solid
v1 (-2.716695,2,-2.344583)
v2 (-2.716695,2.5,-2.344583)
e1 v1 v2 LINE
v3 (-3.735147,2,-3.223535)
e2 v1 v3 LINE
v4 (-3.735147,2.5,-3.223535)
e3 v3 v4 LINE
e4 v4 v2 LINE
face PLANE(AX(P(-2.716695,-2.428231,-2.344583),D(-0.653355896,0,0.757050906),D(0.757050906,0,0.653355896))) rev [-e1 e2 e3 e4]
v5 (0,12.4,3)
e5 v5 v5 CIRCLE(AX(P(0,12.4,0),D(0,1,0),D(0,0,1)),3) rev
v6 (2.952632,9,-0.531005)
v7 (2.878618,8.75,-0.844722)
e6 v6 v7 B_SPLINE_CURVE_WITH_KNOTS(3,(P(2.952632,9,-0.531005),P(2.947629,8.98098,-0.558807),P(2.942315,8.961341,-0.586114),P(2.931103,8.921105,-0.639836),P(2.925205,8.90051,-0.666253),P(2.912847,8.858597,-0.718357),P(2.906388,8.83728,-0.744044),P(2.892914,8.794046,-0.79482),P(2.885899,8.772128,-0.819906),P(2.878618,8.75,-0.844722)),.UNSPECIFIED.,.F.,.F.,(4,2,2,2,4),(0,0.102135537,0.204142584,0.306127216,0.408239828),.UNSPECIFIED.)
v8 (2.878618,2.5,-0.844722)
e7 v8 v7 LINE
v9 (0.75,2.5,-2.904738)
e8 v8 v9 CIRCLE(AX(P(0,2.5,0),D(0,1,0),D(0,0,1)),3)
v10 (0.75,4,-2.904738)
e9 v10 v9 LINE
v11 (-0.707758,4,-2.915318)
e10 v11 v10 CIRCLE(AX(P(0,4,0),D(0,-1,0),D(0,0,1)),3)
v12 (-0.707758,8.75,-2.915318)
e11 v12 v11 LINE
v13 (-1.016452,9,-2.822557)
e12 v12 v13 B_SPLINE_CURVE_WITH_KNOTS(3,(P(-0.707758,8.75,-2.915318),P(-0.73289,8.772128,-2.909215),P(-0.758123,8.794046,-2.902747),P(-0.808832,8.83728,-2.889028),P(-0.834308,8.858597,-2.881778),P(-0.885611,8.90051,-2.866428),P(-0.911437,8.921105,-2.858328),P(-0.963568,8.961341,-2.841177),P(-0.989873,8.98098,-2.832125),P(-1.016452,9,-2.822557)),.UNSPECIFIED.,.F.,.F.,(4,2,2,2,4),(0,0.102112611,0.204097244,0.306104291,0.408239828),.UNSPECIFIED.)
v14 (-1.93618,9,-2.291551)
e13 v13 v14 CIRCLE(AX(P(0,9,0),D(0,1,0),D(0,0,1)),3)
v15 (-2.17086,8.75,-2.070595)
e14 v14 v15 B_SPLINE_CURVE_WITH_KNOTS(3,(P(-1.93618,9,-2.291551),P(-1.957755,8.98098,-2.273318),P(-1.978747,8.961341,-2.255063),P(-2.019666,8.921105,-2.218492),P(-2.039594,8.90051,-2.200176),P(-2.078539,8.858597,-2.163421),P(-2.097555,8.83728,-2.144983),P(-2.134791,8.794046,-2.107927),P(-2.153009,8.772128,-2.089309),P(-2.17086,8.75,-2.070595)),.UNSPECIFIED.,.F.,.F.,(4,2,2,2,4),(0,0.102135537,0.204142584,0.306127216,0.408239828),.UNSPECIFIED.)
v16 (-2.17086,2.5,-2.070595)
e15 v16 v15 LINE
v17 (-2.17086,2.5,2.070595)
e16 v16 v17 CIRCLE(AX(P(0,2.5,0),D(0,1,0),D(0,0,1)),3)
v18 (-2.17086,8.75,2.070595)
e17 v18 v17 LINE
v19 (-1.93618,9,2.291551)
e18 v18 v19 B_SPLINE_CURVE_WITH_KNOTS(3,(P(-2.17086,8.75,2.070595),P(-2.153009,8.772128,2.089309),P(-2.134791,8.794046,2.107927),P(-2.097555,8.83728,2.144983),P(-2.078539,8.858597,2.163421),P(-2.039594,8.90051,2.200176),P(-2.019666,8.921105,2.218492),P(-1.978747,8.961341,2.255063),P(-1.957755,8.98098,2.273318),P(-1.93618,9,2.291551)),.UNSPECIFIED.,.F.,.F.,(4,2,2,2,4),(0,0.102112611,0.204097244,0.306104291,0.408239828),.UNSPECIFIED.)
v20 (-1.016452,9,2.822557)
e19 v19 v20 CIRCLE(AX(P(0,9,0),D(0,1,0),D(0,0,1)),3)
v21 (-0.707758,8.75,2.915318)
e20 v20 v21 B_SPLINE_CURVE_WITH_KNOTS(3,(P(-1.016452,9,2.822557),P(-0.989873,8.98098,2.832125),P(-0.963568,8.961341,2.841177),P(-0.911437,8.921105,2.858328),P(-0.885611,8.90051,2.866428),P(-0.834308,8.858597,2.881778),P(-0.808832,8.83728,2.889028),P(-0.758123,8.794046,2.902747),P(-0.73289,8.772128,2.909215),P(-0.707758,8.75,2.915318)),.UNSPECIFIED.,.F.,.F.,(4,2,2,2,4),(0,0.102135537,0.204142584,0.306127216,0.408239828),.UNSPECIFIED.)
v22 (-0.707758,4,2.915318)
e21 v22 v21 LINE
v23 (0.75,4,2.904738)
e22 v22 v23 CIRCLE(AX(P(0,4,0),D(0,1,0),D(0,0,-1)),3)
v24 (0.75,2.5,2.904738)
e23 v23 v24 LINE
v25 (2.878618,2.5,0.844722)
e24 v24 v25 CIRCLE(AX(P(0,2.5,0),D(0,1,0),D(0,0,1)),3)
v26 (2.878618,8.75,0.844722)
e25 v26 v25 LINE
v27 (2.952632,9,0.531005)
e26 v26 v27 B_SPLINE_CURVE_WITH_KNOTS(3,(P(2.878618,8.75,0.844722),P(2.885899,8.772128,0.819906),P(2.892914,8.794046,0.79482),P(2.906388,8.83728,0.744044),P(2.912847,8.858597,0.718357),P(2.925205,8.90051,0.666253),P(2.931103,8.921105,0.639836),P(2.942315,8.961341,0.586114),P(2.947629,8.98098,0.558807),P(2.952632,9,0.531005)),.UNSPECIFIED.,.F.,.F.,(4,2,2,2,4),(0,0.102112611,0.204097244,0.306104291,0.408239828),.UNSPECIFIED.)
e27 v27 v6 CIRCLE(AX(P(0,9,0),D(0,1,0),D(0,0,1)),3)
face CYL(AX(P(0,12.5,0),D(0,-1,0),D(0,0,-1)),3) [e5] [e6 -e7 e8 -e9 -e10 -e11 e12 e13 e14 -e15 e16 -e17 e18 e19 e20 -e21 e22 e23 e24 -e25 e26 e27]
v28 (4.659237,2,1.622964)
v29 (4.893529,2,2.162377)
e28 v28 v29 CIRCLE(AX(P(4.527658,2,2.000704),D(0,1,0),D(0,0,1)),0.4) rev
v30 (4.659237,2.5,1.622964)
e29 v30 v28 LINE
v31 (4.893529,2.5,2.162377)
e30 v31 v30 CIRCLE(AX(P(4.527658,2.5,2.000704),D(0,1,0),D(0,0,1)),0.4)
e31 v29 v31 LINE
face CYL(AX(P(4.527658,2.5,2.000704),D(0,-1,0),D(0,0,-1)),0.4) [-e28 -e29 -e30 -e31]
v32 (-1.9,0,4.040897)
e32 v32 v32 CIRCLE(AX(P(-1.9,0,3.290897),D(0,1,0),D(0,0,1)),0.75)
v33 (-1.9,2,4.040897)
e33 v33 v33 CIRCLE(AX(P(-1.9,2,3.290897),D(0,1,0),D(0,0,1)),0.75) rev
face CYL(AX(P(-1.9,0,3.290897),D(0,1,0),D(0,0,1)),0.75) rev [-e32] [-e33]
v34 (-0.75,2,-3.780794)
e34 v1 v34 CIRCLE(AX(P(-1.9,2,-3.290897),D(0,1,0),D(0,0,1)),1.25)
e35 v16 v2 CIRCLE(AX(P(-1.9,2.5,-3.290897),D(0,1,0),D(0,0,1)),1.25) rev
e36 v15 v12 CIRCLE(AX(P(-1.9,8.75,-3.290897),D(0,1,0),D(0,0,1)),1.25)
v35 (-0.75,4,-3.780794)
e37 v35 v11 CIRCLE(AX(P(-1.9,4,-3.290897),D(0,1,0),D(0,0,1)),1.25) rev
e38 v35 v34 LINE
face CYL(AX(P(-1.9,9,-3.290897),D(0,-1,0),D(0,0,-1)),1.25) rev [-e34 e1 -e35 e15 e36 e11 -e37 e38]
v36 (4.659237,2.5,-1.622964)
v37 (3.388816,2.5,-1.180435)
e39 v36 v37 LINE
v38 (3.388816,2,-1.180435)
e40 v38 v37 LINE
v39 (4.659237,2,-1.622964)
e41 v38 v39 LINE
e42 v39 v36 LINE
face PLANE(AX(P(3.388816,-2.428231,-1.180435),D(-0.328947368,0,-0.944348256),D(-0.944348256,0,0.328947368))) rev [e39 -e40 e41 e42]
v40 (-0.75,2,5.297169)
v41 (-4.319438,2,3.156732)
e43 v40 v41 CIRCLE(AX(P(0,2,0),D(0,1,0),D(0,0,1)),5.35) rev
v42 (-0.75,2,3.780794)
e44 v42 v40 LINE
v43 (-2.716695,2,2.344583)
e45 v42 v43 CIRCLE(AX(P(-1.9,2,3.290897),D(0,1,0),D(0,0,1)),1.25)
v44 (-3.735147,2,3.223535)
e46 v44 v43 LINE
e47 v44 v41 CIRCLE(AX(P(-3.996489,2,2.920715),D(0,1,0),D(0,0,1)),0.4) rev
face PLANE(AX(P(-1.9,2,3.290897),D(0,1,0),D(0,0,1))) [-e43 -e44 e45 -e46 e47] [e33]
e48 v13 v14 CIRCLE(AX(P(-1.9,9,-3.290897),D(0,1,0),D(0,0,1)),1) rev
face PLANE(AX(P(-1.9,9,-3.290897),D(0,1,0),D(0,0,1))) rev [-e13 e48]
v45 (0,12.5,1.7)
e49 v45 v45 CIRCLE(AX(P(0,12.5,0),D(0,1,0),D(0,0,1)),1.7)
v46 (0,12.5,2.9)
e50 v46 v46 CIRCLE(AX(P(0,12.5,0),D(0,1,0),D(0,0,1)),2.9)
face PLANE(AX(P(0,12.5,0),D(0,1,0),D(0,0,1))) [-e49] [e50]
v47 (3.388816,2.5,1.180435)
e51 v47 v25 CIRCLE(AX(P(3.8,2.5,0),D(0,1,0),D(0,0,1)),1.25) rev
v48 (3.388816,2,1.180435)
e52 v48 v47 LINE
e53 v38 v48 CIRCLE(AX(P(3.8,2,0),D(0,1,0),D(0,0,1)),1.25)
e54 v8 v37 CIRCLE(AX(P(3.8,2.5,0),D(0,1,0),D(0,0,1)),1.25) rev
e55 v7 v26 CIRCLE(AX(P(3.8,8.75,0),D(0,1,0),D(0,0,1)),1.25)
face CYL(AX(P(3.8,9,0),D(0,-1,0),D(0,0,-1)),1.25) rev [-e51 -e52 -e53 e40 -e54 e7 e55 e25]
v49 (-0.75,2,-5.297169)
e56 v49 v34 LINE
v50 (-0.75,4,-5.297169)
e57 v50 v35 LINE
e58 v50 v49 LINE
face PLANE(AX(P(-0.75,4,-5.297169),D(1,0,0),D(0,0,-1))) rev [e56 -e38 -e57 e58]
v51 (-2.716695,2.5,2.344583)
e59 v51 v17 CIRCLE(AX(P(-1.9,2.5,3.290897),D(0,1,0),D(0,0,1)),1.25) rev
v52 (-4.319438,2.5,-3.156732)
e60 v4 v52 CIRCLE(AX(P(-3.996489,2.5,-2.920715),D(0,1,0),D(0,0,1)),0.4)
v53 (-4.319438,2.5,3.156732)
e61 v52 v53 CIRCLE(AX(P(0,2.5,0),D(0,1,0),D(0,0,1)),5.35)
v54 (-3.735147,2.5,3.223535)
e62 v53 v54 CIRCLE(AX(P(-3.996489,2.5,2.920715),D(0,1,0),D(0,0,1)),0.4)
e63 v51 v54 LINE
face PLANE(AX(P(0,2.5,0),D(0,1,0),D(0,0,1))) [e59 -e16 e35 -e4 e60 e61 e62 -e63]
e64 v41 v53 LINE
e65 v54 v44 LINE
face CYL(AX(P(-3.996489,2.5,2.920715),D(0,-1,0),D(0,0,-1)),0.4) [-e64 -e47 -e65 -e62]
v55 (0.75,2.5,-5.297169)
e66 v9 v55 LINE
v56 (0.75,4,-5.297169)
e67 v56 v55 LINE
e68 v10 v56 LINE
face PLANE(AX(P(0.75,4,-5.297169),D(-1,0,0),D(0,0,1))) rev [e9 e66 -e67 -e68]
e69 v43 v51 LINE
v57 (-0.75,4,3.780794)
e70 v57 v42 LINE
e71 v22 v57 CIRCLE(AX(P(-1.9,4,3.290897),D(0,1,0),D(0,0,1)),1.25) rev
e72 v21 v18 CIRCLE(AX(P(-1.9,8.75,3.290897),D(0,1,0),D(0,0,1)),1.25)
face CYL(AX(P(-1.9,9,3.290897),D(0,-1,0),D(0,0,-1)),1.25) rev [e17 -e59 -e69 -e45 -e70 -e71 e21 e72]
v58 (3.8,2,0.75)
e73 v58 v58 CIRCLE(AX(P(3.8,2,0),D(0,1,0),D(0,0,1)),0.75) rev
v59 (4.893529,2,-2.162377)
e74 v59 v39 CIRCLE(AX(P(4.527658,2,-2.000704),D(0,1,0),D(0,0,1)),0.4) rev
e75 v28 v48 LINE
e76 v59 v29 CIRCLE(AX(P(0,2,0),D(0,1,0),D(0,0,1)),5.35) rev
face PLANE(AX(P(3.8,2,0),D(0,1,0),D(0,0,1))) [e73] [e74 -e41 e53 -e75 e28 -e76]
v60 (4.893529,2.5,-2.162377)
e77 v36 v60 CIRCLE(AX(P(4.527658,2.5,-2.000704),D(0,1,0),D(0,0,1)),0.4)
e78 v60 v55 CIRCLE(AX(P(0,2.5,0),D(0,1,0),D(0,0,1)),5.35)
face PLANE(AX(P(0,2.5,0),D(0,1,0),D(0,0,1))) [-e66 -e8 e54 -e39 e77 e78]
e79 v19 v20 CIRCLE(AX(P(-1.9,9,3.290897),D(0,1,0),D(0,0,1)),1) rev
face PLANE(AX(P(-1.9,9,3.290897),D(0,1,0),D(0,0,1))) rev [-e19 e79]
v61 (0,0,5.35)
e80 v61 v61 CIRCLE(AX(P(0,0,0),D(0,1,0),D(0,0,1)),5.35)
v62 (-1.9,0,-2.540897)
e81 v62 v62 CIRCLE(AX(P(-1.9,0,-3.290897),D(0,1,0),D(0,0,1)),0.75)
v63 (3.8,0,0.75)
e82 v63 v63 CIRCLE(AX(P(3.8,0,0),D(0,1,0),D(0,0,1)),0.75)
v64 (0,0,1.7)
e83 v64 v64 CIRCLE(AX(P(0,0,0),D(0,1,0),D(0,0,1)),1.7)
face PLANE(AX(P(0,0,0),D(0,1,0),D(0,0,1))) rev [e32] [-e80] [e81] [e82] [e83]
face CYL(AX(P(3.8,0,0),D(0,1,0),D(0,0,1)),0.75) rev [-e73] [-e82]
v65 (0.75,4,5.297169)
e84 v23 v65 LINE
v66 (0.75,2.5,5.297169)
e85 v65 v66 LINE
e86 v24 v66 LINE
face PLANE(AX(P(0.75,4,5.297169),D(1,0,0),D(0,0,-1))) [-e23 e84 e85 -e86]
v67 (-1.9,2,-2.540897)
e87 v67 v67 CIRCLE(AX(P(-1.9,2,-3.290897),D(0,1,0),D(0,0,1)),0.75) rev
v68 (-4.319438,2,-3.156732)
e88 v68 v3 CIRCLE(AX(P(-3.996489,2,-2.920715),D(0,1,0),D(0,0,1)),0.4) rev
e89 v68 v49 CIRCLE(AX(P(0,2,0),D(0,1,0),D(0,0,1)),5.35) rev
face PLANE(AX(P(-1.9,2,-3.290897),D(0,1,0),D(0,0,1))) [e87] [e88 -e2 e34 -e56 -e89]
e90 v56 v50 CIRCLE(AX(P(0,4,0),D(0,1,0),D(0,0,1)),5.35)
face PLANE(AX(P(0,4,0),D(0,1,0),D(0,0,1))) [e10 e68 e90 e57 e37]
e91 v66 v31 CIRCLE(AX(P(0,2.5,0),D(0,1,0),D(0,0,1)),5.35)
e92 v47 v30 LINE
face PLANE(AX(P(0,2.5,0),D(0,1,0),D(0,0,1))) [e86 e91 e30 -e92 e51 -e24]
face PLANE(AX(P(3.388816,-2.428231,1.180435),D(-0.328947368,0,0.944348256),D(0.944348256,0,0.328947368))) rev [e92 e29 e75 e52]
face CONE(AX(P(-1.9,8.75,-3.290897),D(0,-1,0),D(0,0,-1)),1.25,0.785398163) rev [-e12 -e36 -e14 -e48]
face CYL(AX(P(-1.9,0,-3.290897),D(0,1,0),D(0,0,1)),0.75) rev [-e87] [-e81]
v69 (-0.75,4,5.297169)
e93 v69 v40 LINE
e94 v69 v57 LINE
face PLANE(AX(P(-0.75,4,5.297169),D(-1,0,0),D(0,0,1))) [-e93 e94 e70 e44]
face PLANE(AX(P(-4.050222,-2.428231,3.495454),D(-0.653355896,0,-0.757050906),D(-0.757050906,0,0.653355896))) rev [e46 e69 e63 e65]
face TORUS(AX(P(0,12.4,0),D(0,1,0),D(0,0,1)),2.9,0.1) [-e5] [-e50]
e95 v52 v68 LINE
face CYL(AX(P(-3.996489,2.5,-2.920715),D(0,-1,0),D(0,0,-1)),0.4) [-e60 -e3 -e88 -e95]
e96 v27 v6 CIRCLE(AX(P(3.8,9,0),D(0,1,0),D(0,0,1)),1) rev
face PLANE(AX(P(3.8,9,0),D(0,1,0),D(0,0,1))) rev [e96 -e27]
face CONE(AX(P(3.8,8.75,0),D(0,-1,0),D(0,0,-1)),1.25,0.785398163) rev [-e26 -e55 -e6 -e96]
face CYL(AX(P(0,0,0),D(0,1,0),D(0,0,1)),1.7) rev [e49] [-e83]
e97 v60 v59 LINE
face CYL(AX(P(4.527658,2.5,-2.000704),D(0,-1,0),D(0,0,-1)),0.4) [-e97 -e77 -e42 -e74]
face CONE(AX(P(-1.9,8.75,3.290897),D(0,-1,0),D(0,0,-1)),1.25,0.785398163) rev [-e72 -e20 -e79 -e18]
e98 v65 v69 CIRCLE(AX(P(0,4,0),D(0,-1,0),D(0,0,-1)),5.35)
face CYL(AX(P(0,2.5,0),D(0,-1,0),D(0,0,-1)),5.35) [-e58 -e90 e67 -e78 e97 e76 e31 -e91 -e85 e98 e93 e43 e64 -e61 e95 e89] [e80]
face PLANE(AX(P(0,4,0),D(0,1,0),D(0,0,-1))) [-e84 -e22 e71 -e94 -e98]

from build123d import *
from build123d.topology import SkipClean

# Parameters (mm, degrees)
SKETCH1_R           = 5.35
BOSS_EXTRUDE1_DEPTH = 2.5
HOLE1_OUTLINE_R     = 1.7
HOLE1_DEPTH         = 2.5
SKETCH3_R           = 3
SKETCH3_R_2         = 1.7
BOSS_EXTRUDE2_DEPTH = 10
FILLET1_R           = 0.1
BOSS_EXTRUDE3_DEPTH = 1.5
SKETCH8_R           = 0.75
CUT_EXTRUDE1_DEPTH  = 13.539736839
CUT_EXTRUDE3_START  = -0.5
SKETCH13_R          = 1.25
CUT_EXTRUDE3_DEPTH  = 7
CHAMFER1_SIZE       = 0.25
CUT_EXTRUDE4_START  = -0.5
CUT_EXTRUDE4_DEPTH  = 0.5
FILLET2_R           = 0.4


# Read off the part's stored shape, not the designer's step: Hole1
with BuildPart() as part:
    # Sketch1 → Boss-Extrude1 (new body)
    with BuildSketch(Plane(origin=(0, 0, 0), x_dir=(1, 0, 0), z_dir=(0, 1, 0))):
        with Locations(Location((0, 0, 0), (0, 0, 270))):
            Circle(SKETCH1_R)
    extrude(amount=BOSS_EXTRUDE1_DEPTH)

    # Hole1 outline → Hole1 (cut)
    with BuildSketch(Plane(origin=(0, 0, 0), x_dir=(1, 0, 0), z_dir=(0, 1, 0))):
        Circle(HOLE1_OUTLINE_R)
    extrude(amount=HOLE1_DEPTH, mode=Mode.SUBTRACT)

    # Sketch3 → Boss-Extrude2 (add)
    with BuildSketch(Plane(origin=(0, 2.5, 0), x_dir=(1, 0, 0), z_dir=(0, 1, 0))):
        with Locations(Location((0, 0, 0), (0, 0, 270))):
            Circle(SKETCH3_R)
        with Locations(Location((0, 0, 0), (0, 0, 270))):
            Circle(SKETCH3_R_2, mode=Mode.SUBTRACT)
    extrude(amount=BOSS_EXTRUDE2_DEPTH)

    # Fillet1
    fillet1_edges = [part.edges().sort_by_distance(p)[0] for p in [
        (0, 12.5, -3),
    ]]
    fillet(fillet1_edges, radius=FILLET1_R)

    # Sketch5 → Boss-Extrude3 (add)
    with BuildSketch(Plane(origin=(0, 2.5, 0), x_dir=(1, 0, 0), z_dir=(0, 1, 0))):
        with BuildLine():
            Line((-0.75, 5.297169055), (-0.75, 2.90473751))
            ThreePointArc((-0.75, 2.90473751), (0, 3), (0.75, 2.90473751))
            Line((0.75, 2.90473751), (0.75, 5.297169055))
            ThreePointArc((0.75, 5.297169055), (0, 5.35), (-0.75, 5.297169055))
        make_face()
    boss_extrude3 = extrude(amount=BOSS_EXTRUDE3_DEPTH)

    # Mirror1: Boss-Extrude3 across plane
    with SkipClean():  # the faces are left unmerged after this step: merging them gives an invalid solid
        add(boss_extrude3.mirror(Plane.XY))

    # Sketch8 → Cut-Extrude1 (cut, through all)
    with SkipClean():  # the faces are left unmerged after this step: merging them gives an invalid solid
        with BuildSketch(Plane(origin=(0, 2.5, 0), x_dir=(1, 0, 0), z_dir=(0, 1, 0))):
            with Locations(Location((3.8, 0, 0), (0, 0, 270))):
                Circle(SKETCH8_R)
            with Locations(Location((-1.9, -3.290896534, 0), (0, 0, 270))):
                Circle(SKETCH8_R)
            with Locations(Location((-1.9, 3.290896534, 0), (0, 0, 270))):
                Circle(SKETCH8_R)
        extrude(amount=-CUT_EXTRUDE1_DEPTH, mode=Mode.SUBTRACT)

    # Sketch13 → Cut-Extrude3 (cut)
    with SkipClean():  # the faces are left unmerged after this step: merging them gives an invalid solid
        with BuildSketch(Plane(origin=(0, 2.5, 0), x_dir=(1, 0, 0), z_dir=(0, 1, 0)).offset(CUT_EXTRUDE3_START)):
            with Locations(Location((-1.9, 3.290896534, 0), (0, 0, 23.073918066))):
                Circle(SKETCH13_R)
            with Locations(Location((-1.9, -3.290896534, 0), (0, 0, 102.514591278))):
                Circle(SKETCH13_R)
            with Locations(Location((3.8, 0, 0), (0, 0, 137.485408722))):
                Circle(SKETCH13_R)
        extrude(amount=CUT_EXTRUDE3_DEPTH, mode=Mode.SUBTRACT)

    # Chamfer1
    chamfer1_edges = [part.edges().sort_by_distance(p)[0] for p in [
        (-1.275, 9, -2.20836478),
        (-1.275, 9, 2.20836478),
        (2.55, 9, 0),
    ]]
    chamfer(chamfer1_edges, length=CHAMFER1_SIZE)

    # Sketch14 → Cut-Extrude4 (cut)
    with BuildSketch(Plane(origin=(0, 2.5, 0), x_dir=(1, 0, 0), z_dir=(0, 1, 0)).offset(CUT_EXTRUDE4_START)):
        with BuildLine():
            Line((-0.75, -3.780794483), (-0.75, -5.297169055))
            ThreePointArc((-0.75, -5.297169055), (-2.563606422, -4.695787699), (-4.050222345, -3.495454041))
            Line((-4.050222345, -3.495454041), (-2.716694869, -2.344582902))
            ThreePointArc((-2.716694869, -2.344582902), (-2.637189937, -4.300377092), (-0.75, -3.780794483))
        make_face()
        with BuildLine():
            Line((-0.75, 5.297169055), (-0.75, 3.780794483))
            ThreePointArc((-0.75, 3.780794483), (-2.637189937, 4.300377092), (-2.716694869, 2.344582902))
            Line((-2.716694869, 2.344582902), (-4.050222345, 3.495454041))
            ThreePointArc((-4.050222345, 3.495454041), (-2.563606422, 4.695787699), (-0.75, 5.297169055))
        make_face()
        with BuildLine():
            Line((3.388815789, -1.18043532), (5.05226317, -1.759868421))
            ThreePointArc((5.05226317, -1.759868421), (5.35, 0), (5.05226317, 1.759868421))
            Line((5.05226317, 1.759868421), (3.388815789, 1.18043532))
            ThreePointArc((3.388815789, 1.18043532), (5.05, 0), (3.388815789, -1.18043532))
        make_face()
    extrude(amount=CUT_EXTRUDE4_DEPTH, mode=Mode.SUBTRACT)

    # Fillet2
    fillet2_edges = [part.edges().sort_by_distance(p)[0] for p in [
        (-4.050222345, 2.25, -3.495454041),
        (-4.050222345, 2.25, 3.495454041),
        (5.05226317, 2.25, -1.759868421),
        (5.05226317, 2.25, 1.759868421),
    ]]
    fillet(fillet2_edges, radius=FILLET2_R)


solid = part.part
